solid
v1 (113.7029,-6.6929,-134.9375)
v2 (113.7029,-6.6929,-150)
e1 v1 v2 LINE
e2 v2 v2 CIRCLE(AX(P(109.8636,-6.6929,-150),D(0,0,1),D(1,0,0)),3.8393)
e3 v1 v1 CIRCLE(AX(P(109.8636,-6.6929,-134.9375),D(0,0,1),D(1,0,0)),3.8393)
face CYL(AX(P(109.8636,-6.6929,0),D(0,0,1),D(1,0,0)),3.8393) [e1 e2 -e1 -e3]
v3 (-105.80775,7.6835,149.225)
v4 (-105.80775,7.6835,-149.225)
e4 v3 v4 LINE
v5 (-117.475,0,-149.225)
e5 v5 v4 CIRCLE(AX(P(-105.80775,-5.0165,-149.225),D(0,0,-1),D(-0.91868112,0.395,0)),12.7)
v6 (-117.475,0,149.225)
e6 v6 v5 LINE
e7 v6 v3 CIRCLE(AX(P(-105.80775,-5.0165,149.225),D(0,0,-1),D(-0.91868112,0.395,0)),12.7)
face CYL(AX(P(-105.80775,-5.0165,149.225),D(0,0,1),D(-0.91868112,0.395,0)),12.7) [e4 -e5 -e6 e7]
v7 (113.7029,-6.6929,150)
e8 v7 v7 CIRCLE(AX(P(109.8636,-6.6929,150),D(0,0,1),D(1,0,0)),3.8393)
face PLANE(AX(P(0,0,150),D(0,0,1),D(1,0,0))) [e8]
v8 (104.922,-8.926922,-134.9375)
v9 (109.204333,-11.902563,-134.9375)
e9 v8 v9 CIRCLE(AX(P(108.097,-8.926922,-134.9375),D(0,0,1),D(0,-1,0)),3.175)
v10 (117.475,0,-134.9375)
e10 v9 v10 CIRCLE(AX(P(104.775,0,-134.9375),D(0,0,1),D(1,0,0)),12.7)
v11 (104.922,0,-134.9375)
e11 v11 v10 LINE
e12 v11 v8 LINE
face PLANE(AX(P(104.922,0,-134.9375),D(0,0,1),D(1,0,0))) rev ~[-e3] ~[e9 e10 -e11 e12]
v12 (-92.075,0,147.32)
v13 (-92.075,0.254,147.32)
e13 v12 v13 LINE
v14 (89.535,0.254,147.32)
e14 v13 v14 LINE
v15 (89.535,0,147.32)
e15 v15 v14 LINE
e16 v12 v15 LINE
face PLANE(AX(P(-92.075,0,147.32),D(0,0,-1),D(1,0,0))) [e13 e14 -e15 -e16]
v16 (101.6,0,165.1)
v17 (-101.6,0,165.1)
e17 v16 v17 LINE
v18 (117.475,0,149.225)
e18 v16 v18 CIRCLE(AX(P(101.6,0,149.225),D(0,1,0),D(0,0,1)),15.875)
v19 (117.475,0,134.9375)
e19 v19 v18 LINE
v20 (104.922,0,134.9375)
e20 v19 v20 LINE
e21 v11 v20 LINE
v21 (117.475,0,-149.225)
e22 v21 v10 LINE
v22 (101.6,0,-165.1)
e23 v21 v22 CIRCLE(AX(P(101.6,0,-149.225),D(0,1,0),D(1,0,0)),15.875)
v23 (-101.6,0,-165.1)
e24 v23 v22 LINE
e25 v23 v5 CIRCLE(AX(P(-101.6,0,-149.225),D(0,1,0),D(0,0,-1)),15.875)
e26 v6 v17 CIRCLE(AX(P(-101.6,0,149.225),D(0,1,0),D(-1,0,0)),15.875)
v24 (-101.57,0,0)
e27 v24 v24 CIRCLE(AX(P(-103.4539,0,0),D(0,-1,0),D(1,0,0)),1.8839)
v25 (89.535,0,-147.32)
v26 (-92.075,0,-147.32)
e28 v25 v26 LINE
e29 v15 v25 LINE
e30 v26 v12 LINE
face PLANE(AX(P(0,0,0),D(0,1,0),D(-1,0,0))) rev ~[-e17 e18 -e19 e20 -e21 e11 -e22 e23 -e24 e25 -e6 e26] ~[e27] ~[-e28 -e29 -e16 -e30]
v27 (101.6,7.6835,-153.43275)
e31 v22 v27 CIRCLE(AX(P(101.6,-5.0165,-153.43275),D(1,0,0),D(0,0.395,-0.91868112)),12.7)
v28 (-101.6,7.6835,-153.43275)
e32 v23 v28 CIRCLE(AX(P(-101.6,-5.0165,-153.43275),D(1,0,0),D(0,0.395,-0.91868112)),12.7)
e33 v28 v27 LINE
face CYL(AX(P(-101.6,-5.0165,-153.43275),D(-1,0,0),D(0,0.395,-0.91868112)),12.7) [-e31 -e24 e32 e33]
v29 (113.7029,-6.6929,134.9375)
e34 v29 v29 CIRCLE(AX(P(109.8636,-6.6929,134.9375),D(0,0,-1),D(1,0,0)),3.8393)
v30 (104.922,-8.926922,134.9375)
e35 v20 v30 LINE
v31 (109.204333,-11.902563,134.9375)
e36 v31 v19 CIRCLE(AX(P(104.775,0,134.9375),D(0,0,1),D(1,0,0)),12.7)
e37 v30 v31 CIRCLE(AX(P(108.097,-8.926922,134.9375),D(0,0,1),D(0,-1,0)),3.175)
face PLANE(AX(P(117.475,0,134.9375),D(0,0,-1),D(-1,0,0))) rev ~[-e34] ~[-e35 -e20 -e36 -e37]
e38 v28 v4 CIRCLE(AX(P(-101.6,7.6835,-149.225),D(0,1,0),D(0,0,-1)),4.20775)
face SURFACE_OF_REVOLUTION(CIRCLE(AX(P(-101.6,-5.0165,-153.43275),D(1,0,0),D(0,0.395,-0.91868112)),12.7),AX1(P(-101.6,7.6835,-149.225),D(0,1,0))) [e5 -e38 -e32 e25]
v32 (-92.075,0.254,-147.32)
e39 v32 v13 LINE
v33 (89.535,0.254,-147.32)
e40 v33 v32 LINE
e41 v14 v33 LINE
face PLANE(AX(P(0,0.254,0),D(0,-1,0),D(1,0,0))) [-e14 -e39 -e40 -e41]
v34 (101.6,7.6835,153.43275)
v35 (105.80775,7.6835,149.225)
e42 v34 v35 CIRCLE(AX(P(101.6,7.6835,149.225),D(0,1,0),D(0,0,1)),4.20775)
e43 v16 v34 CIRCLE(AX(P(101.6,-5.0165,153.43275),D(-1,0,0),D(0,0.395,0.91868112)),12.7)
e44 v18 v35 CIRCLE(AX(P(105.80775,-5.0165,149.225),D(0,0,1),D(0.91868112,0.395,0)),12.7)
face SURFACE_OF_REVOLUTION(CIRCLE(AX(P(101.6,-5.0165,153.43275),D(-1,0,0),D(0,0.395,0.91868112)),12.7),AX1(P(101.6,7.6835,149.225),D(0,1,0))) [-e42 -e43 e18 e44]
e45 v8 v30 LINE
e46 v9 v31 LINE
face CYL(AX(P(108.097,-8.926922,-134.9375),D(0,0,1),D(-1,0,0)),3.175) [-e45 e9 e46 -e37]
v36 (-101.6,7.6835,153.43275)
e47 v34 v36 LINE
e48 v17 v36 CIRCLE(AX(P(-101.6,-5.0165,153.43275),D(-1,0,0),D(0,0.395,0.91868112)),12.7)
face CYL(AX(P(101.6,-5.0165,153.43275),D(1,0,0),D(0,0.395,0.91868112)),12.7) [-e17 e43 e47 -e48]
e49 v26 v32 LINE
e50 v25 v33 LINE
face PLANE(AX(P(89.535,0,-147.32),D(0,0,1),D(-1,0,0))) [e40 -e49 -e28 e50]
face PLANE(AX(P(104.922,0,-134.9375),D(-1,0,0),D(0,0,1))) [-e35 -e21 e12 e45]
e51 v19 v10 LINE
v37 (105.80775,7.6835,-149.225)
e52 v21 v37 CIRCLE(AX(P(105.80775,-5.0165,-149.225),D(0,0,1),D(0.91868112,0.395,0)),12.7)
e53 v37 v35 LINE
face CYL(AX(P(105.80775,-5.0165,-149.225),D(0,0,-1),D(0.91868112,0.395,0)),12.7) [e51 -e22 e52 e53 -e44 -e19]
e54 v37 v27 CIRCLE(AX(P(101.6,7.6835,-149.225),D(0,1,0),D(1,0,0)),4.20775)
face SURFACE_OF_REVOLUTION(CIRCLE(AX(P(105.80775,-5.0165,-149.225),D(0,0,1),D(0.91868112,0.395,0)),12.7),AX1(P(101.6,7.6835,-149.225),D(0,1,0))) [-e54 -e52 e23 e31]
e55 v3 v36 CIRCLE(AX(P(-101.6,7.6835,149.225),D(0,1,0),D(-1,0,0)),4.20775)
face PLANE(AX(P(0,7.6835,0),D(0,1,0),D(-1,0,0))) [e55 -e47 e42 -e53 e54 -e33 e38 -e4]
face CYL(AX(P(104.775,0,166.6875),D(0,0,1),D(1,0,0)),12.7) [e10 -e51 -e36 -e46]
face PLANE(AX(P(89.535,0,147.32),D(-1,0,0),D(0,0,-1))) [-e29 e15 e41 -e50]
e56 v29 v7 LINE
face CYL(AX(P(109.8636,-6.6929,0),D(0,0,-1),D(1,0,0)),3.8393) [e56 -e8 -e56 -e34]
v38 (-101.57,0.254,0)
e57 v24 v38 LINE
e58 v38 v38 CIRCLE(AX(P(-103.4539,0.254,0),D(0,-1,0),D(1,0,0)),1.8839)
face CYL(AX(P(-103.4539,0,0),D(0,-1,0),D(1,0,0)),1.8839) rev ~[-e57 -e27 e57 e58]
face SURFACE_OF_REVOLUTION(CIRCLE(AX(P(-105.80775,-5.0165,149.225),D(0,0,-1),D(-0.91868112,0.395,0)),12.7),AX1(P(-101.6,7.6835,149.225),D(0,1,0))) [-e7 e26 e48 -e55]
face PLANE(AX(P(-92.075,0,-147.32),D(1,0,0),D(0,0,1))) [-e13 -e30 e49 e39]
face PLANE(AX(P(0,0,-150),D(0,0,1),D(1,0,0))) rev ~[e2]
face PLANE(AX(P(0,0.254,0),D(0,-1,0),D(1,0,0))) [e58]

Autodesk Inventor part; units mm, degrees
ref_plane "YZ Plane" through (0, 0, 0) normal (1, 0, 0) x (0, 1, 0)
ref_plane "XZ Plane" through (0, 0, 0) normal (0, 1, 0) x (-1, 0, 0)
ref_plane "XY Plane" through (0, 0, 0) normal (0, 0, 1) x (1, 0, 0)
sketch "Sketch1" plane through (0, 0, 0) normal (0, 1, 0) x (-1, 0, 0)
  line L0 (-101.6, 165.1) -> (101.6, 165.1)
  line L1 (117.475, 149.225) -> (117.475, -149.225)
  line L2 (101.6, -165.1) -> (-101.6, -165.1)
  line L3 (-117.475, -149.225) -> (-117.475, 149.225)
  line L4 (-117.475, 165.1) -> (117.475, -165.1) construction
  line L5 (117.475, 165.1) -> (-117.475, -165.1) construction
  arc A0 (-101.6, 165.1) -> (-117.475, 149.225) centre (-101.6, 149.225) ccw
  arc A1 (-117.475, -149.225) -> (-101.6, -165.1) centre (-101.6, -149.225) ccw
  arc A2 (101.6, -165.1) -> (117.475, -149.225) centre (101.6, -149.225) ccw
  arc A3 (117.475, 149.225) -> (101.6, 165.1) centre (101.6, 149.225) ccw
  point P0 (0, 0)
  point P1 (0, 0)
  dimension "d0" = 330.2
  dimension "d1" = 234.95
  dimension "d2" = 15.875
extrude "Extrusion1" add sketch "Sketch1" along normal blind 7.6835
fillet "Fillet1" radius 12.7 8 edges at (117.475, 7.6835, 0) (112.8253, 7.6835, -160.4503) (0, 7.6835, -165.1) (-112.8253, 7.6835, -160.4503) (-117.475, 7.6835, 0) (-112.8253, 7.6835, 160.4503) (0, 7.6835, 165.1) (112.8253, 7.6835, 160.4503)
sketch "Sketch2" plane through (0, 0, 0) normal (0, -1, 0) x (1, 0, 0)
  line L0 (101.6103, 150.8125) -> (101.6103, -150.8125) projected
  arc A0 (101.6103, 150.8125) -> (101.6, 150.8228) centre (101.6, 150.8125) ccw projected
  line L1 (-101.6, 150.8228) -> (101.6, 150.8228) projected
  arc A1 (-101.6, 150.8228) -> (-101.6103, 150.8125) centre (-101.6, 150.8125) ccw projected
  line L2 (-101.6103, -150.8125) -> (-101.6103, 150.8125) projected
  arc A2 (-101.6103, -150.8125) -> (-101.6, -150.8228) centre (-101.6, -150.8125) ccw projected
  line L3 (101.6, -150.8228) -> (-101.6, -150.8228) projected
  arc A3 (101.6, -150.8228) -> (101.6103, -150.8125) centre (101.6, -150.8125) ccw projected
  line L4 (103.505, -134.9375) -> (117.475, -134.9375) projected
  line L5 (117.475, -134.9375) -> (117.475, -150.8125) projected
  arc A4 (101.6, -166.6875) -> (117.475, -150.8125) centre (101.6, -150.8125) ccw projected
  line L6 (101.6, -166.6875) -> (-101.6, -166.6875) projected
  arc A5 (-117.475, -150.8125) -> (-101.6, -166.6875) centre (-101.6, -150.8125) ccw projected
  line L7 (-117.475, -150.8125) -> (-117.475, 150.8125) projected
  arc A6 (-101.6, 166.6875) -> (-117.475, 150.8125) centre (-101.6, 150.8125) ccw projected
  line L8 (-101.6, 166.6875) -> (101.6, 166.6875) projected
  arc A7 (117.475, 150.8125) -> (101.6, 166.6875) centre (101.6, 150.8125) ccw projected
  line L9 (117.475, 150.8125) -> (117.475, 134.9375) projected
  line L10 (117.475, 134.9375) -> (103.505, 134.9375) projected
  line L11 (103.505, 134.9375) -> (103.505, -134.9375) projected
  circle A8 centre (76.6206, 156.377) radius 5.1319 projected
  line L12 (-38.4175, -52.3875) -> (-38.4175, 52.3875) projected
  line L13 (-38.4175, 52.3875) -> (-104.4575, 52.3875) projected
  line L14 (-104.4575, 52.3875) -> (-104.4575, -52.3875) projected
  line L15 (-104.4575, -52.3875) -> (-38.4175, -52.3875) projected
  line L16 (88.265, -146.05) -> (88.265, 146.05) projected
  line L17 (88.265, 146.05) -> (-28.8925, 146.05) projected
  line L18 (-28.8925, 146.05) -> (-28.8925, -146.05) projected
  line L19 (-28.8925, -146.05) -> (88.265, -146.05) projected
  line L20 (104.922, 134.9375) -> (117.475, 134.9375)
  line L21 (117.475, 134.9375) -> (117.475, -134.9375)
  line L22 (117.475, -134.9375) -> (104.922, -134.9375)
  line L23 (104.922, -134.9375) -> (104.922, 134.9375)
  point P0 (0, 0)
extrude "Extrusion2" add sketch "Sketch2" along normal blind 12.7 contours L23 L10 L21 L4
sketch "Sketch4" plane through (0, 0, 0) normal (0, 0, 1) x (1, 0, 0)
  circle A0 centre (109.8636, -6.6929) radius 3.8393 projected
  circle A1 centre (109.8636, -6.6929) radius 3.8393 projected
  point P0 (0, 0)
extrude "Extrusion3" add sketch "Sketch4" along normal mid plane 300
fillet "Fillet2" radius 12.7 1 edges at (117.475, -12.7, 0)
fillet "Fillet3" radius 3.175 1 edges at (104.922, -12.6991, 0)
sketch "Sketch5" plane through (0, 0, 0) normal (0, -1, 0) x (1, 0, 0)
  line L0 (104.922, 134.9375) -> (117.475, 134.9375) projected
  line L1 (117.475, 149.225) -> (117.475, 134.9375) projected
  arc A0 (117.475, 149.225) -> (101.6, 165.1) centre (101.6, 149.225) ccw projected
  line L2 (-101.6, 165.1) -> (101.6, 165.1) projected
  arc A1 (-101.6, 165.1) -> (-117.475, 149.225) centre (-101.6, 149.225) ccw projected
  line L3 (-117.475, -149.225) -> (-117.475, 149.225) projected
  arc A2 (-117.475, -149.225) -> (-101.6, -165.1) centre (-101.6, -149.225) ccw projected
  line L4 (101.6, -165.1) -> (-101.6, -165.1) projected
  arc A3 (101.6, -165.1) -> (117.475, -149.225) centre (101.6, -149.225) ccw projected
  line L5 (117.475, -134.9375) -> (117.475, -149.225) projected
  line L6 (117.475, -134.9375) -> (104.922, -134.9375) projected
  line L7 (104.922, -134.9375) -> (104.922, 134.9375) projected
  line L8 (89.535, -147.32) -> (-92.075, -147.32)
  line L9 (-92.075, -147.32) -> (-92.075, 147.32)
  line L10 (-92.075, 147.32) -> (89.535, 147.32)
  line L11 (89.535, 147.32) -> (89.535, -147.32)
  line L12 (89.535, -147.32) -> (-92.075, 147.32) construction
  line L13 (-92.075, -147.32) -> (89.535, 147.32) construction
  circle A4 centre (-103.4539, 0) radius 1.8839
  point P0 (0, 0)
  point P1 (-1.27, 0)
  dimension "d12" = 17.78
  dimension "d13" = 17.78
  dimension "d14" = 25.4
  dimension "d15" = 27.94
extrude "Extrusion4" cut sketch "Sketch5" against normal blind 0.254 contours L8 L9 L10 L11 | A4
properties part number "dellLatitudeScreen"
